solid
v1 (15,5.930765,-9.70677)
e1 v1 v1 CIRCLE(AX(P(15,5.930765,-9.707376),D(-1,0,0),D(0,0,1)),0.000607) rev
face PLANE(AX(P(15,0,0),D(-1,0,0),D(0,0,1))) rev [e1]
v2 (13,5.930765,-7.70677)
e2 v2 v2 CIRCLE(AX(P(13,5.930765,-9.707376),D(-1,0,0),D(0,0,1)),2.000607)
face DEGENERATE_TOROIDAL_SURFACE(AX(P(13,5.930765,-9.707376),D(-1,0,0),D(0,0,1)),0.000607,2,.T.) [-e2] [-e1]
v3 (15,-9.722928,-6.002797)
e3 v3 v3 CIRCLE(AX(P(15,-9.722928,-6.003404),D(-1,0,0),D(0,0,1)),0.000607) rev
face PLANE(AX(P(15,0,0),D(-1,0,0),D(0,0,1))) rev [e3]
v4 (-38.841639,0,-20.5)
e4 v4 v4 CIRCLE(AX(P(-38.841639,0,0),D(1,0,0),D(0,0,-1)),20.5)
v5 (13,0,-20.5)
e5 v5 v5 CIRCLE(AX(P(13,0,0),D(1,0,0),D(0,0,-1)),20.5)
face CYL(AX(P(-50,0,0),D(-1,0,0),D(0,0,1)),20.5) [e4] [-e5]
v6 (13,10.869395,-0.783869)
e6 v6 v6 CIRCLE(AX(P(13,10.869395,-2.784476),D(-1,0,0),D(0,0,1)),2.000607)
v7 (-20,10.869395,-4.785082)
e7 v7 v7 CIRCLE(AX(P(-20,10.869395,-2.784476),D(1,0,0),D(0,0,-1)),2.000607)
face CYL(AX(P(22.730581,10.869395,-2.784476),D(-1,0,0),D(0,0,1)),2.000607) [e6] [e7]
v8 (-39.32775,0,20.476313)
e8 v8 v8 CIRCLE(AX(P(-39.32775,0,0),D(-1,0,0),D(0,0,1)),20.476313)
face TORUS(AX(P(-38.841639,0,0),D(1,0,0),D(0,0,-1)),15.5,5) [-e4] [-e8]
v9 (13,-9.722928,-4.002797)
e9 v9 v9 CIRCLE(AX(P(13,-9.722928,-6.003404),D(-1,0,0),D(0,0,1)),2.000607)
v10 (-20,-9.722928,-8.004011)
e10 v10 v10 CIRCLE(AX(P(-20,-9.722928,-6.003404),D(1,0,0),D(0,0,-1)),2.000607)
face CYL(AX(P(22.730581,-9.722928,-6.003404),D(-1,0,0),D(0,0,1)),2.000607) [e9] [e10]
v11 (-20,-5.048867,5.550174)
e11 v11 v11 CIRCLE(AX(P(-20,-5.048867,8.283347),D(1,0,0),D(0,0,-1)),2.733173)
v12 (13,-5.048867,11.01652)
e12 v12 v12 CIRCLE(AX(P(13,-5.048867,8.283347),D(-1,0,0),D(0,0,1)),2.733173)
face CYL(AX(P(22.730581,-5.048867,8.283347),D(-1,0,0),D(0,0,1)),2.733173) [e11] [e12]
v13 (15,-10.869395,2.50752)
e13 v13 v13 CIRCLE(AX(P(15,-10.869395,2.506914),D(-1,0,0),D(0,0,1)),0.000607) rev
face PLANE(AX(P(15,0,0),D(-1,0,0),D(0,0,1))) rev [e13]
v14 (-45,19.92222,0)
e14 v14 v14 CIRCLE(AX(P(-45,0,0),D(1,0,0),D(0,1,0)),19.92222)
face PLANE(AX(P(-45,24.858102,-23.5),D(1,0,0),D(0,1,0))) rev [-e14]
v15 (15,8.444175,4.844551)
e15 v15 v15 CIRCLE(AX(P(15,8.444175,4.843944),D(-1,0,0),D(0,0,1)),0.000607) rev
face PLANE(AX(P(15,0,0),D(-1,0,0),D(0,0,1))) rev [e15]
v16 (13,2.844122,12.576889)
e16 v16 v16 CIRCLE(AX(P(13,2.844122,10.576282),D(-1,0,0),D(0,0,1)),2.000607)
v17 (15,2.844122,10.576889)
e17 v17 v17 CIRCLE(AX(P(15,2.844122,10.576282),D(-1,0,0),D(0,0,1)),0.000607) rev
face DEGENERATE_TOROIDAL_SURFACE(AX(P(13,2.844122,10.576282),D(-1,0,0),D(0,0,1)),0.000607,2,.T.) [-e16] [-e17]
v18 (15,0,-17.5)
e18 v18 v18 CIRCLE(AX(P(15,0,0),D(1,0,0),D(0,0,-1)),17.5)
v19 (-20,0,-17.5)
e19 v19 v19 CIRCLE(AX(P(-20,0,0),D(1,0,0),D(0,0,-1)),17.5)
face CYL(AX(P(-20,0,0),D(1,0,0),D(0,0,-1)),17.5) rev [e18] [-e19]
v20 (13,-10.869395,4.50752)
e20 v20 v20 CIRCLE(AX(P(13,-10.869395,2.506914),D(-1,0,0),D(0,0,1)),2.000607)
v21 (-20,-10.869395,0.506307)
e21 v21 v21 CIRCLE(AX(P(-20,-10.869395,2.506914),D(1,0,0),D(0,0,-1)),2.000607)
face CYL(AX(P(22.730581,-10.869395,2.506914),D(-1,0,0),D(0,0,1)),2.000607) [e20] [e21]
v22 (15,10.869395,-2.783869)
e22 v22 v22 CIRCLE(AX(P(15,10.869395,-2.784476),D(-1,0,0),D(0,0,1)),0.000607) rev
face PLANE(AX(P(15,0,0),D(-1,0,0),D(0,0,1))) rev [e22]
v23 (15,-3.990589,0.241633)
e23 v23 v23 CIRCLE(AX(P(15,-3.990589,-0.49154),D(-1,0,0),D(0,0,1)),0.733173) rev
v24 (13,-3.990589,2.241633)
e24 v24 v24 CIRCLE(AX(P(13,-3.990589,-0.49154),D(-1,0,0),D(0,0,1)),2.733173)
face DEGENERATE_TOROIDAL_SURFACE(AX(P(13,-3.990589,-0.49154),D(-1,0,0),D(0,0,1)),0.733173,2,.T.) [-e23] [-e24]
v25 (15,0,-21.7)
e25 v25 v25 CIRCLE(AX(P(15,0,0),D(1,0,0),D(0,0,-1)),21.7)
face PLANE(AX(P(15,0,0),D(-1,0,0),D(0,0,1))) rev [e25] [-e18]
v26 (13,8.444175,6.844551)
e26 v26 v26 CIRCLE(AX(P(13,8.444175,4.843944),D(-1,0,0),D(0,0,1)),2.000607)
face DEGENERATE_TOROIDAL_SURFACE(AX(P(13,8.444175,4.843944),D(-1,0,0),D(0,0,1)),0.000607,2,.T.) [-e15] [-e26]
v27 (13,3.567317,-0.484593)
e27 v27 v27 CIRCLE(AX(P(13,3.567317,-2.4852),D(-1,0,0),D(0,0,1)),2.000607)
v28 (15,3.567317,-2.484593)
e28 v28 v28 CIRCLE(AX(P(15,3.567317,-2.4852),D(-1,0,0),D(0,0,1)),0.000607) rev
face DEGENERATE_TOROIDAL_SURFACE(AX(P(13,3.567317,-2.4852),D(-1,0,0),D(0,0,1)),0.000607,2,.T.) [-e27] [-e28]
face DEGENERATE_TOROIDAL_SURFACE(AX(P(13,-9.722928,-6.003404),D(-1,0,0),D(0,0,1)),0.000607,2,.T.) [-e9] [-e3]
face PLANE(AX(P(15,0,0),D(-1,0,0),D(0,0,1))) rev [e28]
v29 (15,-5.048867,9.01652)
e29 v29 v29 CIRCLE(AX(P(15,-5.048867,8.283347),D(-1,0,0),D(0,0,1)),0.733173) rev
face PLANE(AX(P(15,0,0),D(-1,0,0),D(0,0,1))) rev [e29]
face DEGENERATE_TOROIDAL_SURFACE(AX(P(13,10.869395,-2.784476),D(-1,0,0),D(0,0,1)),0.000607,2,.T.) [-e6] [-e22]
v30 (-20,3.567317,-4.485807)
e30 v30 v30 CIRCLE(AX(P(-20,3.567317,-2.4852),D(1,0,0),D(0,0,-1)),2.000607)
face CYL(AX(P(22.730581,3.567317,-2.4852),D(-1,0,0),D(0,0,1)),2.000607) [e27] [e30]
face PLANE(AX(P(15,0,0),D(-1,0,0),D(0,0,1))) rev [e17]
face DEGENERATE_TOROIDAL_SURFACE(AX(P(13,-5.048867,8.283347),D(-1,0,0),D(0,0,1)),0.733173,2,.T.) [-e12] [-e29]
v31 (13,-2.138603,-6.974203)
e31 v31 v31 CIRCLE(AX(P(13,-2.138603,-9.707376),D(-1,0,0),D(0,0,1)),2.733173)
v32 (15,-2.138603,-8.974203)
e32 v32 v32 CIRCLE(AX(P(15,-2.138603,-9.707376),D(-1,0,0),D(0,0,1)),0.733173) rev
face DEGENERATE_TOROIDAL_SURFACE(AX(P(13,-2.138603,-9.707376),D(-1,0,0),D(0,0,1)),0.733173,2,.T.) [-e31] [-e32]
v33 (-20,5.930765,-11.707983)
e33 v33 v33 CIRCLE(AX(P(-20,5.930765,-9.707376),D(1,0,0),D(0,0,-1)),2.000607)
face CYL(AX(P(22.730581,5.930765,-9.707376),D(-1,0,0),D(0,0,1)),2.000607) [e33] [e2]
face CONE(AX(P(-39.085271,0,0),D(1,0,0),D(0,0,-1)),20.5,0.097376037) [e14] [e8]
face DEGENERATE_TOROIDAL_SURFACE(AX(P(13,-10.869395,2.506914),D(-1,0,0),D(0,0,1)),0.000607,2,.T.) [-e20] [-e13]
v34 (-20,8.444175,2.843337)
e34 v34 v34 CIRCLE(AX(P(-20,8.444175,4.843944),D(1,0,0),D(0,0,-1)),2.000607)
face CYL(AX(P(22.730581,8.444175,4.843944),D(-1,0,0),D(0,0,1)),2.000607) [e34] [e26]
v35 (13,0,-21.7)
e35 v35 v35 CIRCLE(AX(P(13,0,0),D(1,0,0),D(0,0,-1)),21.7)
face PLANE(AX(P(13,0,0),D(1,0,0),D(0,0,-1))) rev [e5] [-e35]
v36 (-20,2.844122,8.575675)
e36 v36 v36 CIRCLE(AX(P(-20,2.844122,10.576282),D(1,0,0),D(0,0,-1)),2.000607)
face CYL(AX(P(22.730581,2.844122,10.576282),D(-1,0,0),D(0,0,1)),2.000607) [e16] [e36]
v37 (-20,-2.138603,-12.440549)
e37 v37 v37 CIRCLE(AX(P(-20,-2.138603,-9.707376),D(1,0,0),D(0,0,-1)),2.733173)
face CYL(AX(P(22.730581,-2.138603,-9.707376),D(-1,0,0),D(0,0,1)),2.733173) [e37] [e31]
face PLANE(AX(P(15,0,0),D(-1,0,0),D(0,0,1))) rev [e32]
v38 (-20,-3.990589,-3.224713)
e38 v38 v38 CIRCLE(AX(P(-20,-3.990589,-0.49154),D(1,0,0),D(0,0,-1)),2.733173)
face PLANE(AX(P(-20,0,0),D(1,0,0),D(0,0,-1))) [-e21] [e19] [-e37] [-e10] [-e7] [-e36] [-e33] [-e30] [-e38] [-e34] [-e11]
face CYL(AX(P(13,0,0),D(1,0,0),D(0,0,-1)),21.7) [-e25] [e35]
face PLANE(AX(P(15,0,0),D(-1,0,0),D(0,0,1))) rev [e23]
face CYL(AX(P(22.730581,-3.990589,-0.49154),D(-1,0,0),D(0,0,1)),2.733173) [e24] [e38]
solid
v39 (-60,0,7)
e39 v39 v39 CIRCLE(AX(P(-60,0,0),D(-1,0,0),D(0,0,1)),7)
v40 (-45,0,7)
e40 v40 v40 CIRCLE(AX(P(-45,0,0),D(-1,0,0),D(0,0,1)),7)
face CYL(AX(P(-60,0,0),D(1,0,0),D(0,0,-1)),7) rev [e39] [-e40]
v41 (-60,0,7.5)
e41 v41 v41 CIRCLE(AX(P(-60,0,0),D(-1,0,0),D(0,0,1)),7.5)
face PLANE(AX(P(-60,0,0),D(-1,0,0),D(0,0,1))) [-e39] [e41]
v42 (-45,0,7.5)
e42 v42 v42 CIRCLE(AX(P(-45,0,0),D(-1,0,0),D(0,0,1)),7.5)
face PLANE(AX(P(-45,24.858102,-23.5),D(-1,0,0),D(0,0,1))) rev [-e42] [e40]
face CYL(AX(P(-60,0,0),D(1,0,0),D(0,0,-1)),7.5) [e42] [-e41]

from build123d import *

# Parameters (mm, degrees)
FILLET1_R               = 5
FILLET2_R               = 0.3
FILLET3_R               = 5
SKETCH4_R               = 17.500000000000004
CUT_EXTRUDE1_DEPTH      = 35
SKETCH5_R               = 2.0006066698857174
SKETCH5_R_2             = 2.0006066698857157
SKETCH5_R_3             = 2.000606669885716
SKETCH5_R_4             = 2.733173099565215
BOSS_EXTRUDE1_DEPTH     = 35
FILLET4_R               = 2
BOSS_EXTRUDE2_START     = -2
SKETCH6_R               = 21.7
SKETCH6_R_2             = 20.5
BOSS_EXTRUDE2_DEPTH     = 2
SKETCH7_R               = 7.5
SKETCH7_R_2             = 7
EXTRUDE_THIN1_DEPTH     = 15
CUT_EXTRUDE2_DEPTH      = 74.00342484850054
CUT_EXTRUDE2_DEPTH_BACK = 74.00342484850054


with BuildPart() as part:
    # Sketch3 → Revolve1 (revolve)
    with BuildSketch(Plane.XY, mode=Mode.PRIVATE) as revolve1_sk:
        with BuildLine():
            Line((65, 0), (65, 20.5))
            Line((65, 20.5), (10.914728577346645, 20.499999999999993))
            Line((10.914728577346645, 20.499999999999993), (-6.999999999999965, 18.75))
            Line((-6.999999999999965, 18.75), (-21.999999999999996, 18.749999999999993))
            Line((-21.999999999999996, 18.749999999999993), (-21.999999999999996, 23.5))
            Line((-21.999999999999996, 23.5), (-27.690911978745813, 23.5))
            ThreePointArc((-27.690911978745813, 23.5), (-34.19859974015539, 21.368483523128404), (-38.18424319433221, 15.800000000000004))
            ThreePointArc((-38.18424319433221, 15.800000000000004), (-39.63356808676015, 13.775096900680587), (-41.99999999999999, 13.000000000000009))
            Line((-41.99999999999999, 13.000000000000009), (-45, 13.000000000000004))
            Line((-45, 13.000000000000004), (-45, 0))
            Line((-45, 0), (-41.99999999999999, 0))
            Line((-41.99999999999999, 0), (65, 0))
        make_face()
    revolve(revolve1_sk.sketch.rotate(Axis((0, 0, 0), (1, 0, 0)), 90), axis=Axis((0, 0, 0), (1, 0, 0)))

    # Fillet1
    # the kernel refuses this fillet: 5 mm, written as the material it adds along each edge
    with BuildSketch(Plane(origin=(-21.999999999999996, 0, 0), x_dir=(0, 1.1e-16, 1), z_dir=(0, 1, -1.1e-16))) as fillet1_piece_1:
        with BuildLine():
            CenterArc((23.75, 4.993746088859545), FILLET1_R, 180, 87.13401601740111)
            Line((23.5, 0), (23.495, -0.09987492177718948))
            ThreePointArc((23.495, -0.09987492177718948), (21.124999999999996, -0.10000000000000142), (18.749999999999993, -0.10000000000000142))
            Line((18.749999999999993, -0.10000000000000142), (18.64999999999999, 0))
            Line((18.64999999999999, 0), (18.65, 4.993746088859545))
            Line((18.65, 4.993746088859545), (18.75, 4.993746088859545))
        make_face()
    revolve(axis=Axis((-21.999999999999996, 0, 0), (1, 0, 0)))

    # Fillet2
    fillet2_edges = [part.edges().sort_by_distance(p)[0] for p in [
        (-21.999999999999996, 4.95e-15, -23.5),
    ]]
    fillet(fillet2_edges, radius=FILLET2_R)

    # Fillet3
    # the kernel refuses this fillet: 5 mm, written as the material it adds along each edge
    with BuildSketch(Plane(origin=(-6.999999999999965, 0, 0), x_dir=(0, 1.1e-16, 1), z_dir=(0, 1, -1.1e-16))) as fillet3_piece_1:
        with BuildLine():
            CenterArc((18.75 + FILLET3_R, -FILLET3_R * 0.0487265272305), FILLET3_R, 174.42076403235384, 5.579235967646127)
            Line((18.75 + FILLET3_R * 0.00473730125852, FILLET3_R * 0.0484956949917), (18.75, 0))
            Line((18.75, 0), (18.75, -FILLET3_R * 0.0487265272305))
        make_face()
    revolve(axis=Axis((-6.999999999999965, 0, 0), (1, 0, 0)))
    # the kernel refuses this fillet: 5 mm, written as the material it takes off along each edge
    with BuildSketch(Plane(origin=(10.914728577346645, 0, 0), x_dir=(0, 1.1e-16, 1), z_dir=(0, 1, -1.1e-16))) as fillet3_2_piece_1:
        with BuildLine():
            CenterArc((20.499999999999993 - FILLET3_R, FILLET3_R * 0.0487265272305), FILLET3_R, 354.4207640323539, 5.579235967646187)
            Line((20.499999999999993, FILLET3_R * 0.0487265272305), (20.499999999999993, 0))
            Line((20.499999999999993, 0), (20.499999999999993 - FILLET3_R * 0.00473730125852, -FILLET3_R * 0.0484956949917))
        make_face()
    revolve(axis=Axis((10.914728577346645, 0, 0), (1, 0, 0)), mode=Mode.SUBTRACT)

    # Sketch4 → Cut-Extrude1 (cut)
    with BuildSketch(Plane(origin=(65, 0, 0), x_dir=(0, 0, -1), z_dir=(1, 0, 0))):
        Circle(SKETCH4_R)
    extrude(amount=-CUT_EXTRUDE1_DEPTH, mode=Mode.SUBTRACT)

    # Sketch5 → Boss-Extrude1 (add)
    with BuildSketch(Plane(origin=(30, 0, 0), x_dir=(0, 0, -1), z_dir=(1, 0, 0))):
        with Locations(Location((2.4851998621818705, 3.5673165613128455, 0), (0, 0, 180))):
            Circle(SKETCH5_R)
        with Locations(Location((2.784475529300205, 10.869395236751556, 0), (0, 0, 180))):
            Circle(SKETCH5_R_2)
        with Locations(Location((-4.843943845783035, 8.444175204210639, 0), (0, 0, 180))):
            Circle(SKETCH5_R)
        with Locations(Location((-10.576282104516107, 2.8441216745252547, 0), (0, 0, 180))):
            Circle(SKETCH5_R_3)
        with Locations(Location((9.707376349462452, 5.930765352304601, 0), (0, 0, 180))):
            Circle(SKETCH5_R_3)
        with Locations(Location((-2.5069136326072483, -10.869395236751556, 0), (0, 0, 180))):
            Circle(SKETCH5_R)
        with Locations(Location((6.003403936127238, -9.722927585004939, 0), (0, 0, 180))):
            Circle(SKETCH5_R)
        with Locations(Location((9.707376349462452, -2.1386031196042588, 0), (0, 0, 180))):
            Circle(SKETCH5_R_4)
        with Locations(Location((0.49154022580697854, -3.990589326271869, 0), (0, 0, 180))):
            Circle(SKETCH5_R_4)
        with Locations(Location((-8.28334680102288, -5.048867158653359, 0), (0, 0, 180))):
            Circle(SKETCH5_R_4)
    extrude(amount=BOSS_EXTRUDE1_DEPTH)

    # Fillet4
    fillet4_edges = [part.edges().sort_by_distance(p)[0] for p in [
        (65, 3.567316561312845, -4.485806532067588),
        (65, 10.869395236751556, -4.78508219918592),
        (65, 8.444175204210639, 2.8433371758973176),
        (65, 2.844121674525254, 8.57567543463039),
        (65, 5.9307653523046, -11.707983019348168),
        (65, -10.869395236751556, 0.5063069627215309),
        (65, -9.722927585004939, -8.004010606012956),
        (65, -2.1386031196042583, -12.440549449027667),
        (65, -3.9905893262718686, -3.2247133253721936),
        (65, -5.0488671586533584, 5.550173701457664),
    ]]
    fillet(fillet4_edges, radius=FILLET4_R)

    # Sketch6 → Boss-Extrude2 (add)
    with BuildSketch(Plane(origin=(65, 0, 0), x_dir=(0, 0, -1), z_dir=(1, 0, 0)).offset(BOSS_EXTRUDE2_START)):
        Circle(SKETCH6_R)
        Circle(SKETCH6_R_2, mode=Mode.SUBTRACT)
    extrude(amount=BOSS_EXTRUDE2_DEPTH)

    # Sketch7 → Extrude-Thin1 (add)
    with BuildSketch(Plane.ZY.offset(45)):
        Circle(SKETCH7_R)
        Circle(SKETCH7_R_2, mode=Mode.SUBTRACT)
    extrude(amount=EXTRUDE_THIN1_DEPTH)

    # Sketch8 → Cut-Extrude2 (cut, two sides: drawn at the far end of the back side and taken through both)
    with BuildSketch(Plane.XY.offset(-CUT_EXTRUDE2_DEPTH_BACK)):
        Polygon((-45, 24.858102264322046), (5.000000000000004, 24.858102264322046), (5.0000000000000115, -25.141897735677954), (-45, -25.141897735677954), align=None)
    extrude(amount=CUT_EXTRUDE2_DEPTH + CUT_EXTRUDE2_DEPTH_BACK, mode=Mode.SUBTRACT)


with BuildPart() as cut_extrude2_piece_1:
    # of the separate pieces the step leaves, piece 1, a body of its own (cut_extrude2_pieces)
    add(part.part.solids().sort_by_distance((63, -10.869395237, 4.507520302))[0])


with BuildPart() as cut_extrude2_piece_2:
    # of the separate pieces the step leaves, piece 2, a body of its own (cut_extrude2_pieces)
    add(part.part.solids().sort_by_distance((-45, 0, 7.5))[0])


with BuildPart() as cut_extrude2_piece_1_1:
    # Body-Move/Copy1: moved
    add(cut_extrude2_piece_1.part.moved(Location((-50, 0, 0))))


solid = Compound([cut_extrude2_piece_2.part, cut_extrude2_piece_1_1.part])
